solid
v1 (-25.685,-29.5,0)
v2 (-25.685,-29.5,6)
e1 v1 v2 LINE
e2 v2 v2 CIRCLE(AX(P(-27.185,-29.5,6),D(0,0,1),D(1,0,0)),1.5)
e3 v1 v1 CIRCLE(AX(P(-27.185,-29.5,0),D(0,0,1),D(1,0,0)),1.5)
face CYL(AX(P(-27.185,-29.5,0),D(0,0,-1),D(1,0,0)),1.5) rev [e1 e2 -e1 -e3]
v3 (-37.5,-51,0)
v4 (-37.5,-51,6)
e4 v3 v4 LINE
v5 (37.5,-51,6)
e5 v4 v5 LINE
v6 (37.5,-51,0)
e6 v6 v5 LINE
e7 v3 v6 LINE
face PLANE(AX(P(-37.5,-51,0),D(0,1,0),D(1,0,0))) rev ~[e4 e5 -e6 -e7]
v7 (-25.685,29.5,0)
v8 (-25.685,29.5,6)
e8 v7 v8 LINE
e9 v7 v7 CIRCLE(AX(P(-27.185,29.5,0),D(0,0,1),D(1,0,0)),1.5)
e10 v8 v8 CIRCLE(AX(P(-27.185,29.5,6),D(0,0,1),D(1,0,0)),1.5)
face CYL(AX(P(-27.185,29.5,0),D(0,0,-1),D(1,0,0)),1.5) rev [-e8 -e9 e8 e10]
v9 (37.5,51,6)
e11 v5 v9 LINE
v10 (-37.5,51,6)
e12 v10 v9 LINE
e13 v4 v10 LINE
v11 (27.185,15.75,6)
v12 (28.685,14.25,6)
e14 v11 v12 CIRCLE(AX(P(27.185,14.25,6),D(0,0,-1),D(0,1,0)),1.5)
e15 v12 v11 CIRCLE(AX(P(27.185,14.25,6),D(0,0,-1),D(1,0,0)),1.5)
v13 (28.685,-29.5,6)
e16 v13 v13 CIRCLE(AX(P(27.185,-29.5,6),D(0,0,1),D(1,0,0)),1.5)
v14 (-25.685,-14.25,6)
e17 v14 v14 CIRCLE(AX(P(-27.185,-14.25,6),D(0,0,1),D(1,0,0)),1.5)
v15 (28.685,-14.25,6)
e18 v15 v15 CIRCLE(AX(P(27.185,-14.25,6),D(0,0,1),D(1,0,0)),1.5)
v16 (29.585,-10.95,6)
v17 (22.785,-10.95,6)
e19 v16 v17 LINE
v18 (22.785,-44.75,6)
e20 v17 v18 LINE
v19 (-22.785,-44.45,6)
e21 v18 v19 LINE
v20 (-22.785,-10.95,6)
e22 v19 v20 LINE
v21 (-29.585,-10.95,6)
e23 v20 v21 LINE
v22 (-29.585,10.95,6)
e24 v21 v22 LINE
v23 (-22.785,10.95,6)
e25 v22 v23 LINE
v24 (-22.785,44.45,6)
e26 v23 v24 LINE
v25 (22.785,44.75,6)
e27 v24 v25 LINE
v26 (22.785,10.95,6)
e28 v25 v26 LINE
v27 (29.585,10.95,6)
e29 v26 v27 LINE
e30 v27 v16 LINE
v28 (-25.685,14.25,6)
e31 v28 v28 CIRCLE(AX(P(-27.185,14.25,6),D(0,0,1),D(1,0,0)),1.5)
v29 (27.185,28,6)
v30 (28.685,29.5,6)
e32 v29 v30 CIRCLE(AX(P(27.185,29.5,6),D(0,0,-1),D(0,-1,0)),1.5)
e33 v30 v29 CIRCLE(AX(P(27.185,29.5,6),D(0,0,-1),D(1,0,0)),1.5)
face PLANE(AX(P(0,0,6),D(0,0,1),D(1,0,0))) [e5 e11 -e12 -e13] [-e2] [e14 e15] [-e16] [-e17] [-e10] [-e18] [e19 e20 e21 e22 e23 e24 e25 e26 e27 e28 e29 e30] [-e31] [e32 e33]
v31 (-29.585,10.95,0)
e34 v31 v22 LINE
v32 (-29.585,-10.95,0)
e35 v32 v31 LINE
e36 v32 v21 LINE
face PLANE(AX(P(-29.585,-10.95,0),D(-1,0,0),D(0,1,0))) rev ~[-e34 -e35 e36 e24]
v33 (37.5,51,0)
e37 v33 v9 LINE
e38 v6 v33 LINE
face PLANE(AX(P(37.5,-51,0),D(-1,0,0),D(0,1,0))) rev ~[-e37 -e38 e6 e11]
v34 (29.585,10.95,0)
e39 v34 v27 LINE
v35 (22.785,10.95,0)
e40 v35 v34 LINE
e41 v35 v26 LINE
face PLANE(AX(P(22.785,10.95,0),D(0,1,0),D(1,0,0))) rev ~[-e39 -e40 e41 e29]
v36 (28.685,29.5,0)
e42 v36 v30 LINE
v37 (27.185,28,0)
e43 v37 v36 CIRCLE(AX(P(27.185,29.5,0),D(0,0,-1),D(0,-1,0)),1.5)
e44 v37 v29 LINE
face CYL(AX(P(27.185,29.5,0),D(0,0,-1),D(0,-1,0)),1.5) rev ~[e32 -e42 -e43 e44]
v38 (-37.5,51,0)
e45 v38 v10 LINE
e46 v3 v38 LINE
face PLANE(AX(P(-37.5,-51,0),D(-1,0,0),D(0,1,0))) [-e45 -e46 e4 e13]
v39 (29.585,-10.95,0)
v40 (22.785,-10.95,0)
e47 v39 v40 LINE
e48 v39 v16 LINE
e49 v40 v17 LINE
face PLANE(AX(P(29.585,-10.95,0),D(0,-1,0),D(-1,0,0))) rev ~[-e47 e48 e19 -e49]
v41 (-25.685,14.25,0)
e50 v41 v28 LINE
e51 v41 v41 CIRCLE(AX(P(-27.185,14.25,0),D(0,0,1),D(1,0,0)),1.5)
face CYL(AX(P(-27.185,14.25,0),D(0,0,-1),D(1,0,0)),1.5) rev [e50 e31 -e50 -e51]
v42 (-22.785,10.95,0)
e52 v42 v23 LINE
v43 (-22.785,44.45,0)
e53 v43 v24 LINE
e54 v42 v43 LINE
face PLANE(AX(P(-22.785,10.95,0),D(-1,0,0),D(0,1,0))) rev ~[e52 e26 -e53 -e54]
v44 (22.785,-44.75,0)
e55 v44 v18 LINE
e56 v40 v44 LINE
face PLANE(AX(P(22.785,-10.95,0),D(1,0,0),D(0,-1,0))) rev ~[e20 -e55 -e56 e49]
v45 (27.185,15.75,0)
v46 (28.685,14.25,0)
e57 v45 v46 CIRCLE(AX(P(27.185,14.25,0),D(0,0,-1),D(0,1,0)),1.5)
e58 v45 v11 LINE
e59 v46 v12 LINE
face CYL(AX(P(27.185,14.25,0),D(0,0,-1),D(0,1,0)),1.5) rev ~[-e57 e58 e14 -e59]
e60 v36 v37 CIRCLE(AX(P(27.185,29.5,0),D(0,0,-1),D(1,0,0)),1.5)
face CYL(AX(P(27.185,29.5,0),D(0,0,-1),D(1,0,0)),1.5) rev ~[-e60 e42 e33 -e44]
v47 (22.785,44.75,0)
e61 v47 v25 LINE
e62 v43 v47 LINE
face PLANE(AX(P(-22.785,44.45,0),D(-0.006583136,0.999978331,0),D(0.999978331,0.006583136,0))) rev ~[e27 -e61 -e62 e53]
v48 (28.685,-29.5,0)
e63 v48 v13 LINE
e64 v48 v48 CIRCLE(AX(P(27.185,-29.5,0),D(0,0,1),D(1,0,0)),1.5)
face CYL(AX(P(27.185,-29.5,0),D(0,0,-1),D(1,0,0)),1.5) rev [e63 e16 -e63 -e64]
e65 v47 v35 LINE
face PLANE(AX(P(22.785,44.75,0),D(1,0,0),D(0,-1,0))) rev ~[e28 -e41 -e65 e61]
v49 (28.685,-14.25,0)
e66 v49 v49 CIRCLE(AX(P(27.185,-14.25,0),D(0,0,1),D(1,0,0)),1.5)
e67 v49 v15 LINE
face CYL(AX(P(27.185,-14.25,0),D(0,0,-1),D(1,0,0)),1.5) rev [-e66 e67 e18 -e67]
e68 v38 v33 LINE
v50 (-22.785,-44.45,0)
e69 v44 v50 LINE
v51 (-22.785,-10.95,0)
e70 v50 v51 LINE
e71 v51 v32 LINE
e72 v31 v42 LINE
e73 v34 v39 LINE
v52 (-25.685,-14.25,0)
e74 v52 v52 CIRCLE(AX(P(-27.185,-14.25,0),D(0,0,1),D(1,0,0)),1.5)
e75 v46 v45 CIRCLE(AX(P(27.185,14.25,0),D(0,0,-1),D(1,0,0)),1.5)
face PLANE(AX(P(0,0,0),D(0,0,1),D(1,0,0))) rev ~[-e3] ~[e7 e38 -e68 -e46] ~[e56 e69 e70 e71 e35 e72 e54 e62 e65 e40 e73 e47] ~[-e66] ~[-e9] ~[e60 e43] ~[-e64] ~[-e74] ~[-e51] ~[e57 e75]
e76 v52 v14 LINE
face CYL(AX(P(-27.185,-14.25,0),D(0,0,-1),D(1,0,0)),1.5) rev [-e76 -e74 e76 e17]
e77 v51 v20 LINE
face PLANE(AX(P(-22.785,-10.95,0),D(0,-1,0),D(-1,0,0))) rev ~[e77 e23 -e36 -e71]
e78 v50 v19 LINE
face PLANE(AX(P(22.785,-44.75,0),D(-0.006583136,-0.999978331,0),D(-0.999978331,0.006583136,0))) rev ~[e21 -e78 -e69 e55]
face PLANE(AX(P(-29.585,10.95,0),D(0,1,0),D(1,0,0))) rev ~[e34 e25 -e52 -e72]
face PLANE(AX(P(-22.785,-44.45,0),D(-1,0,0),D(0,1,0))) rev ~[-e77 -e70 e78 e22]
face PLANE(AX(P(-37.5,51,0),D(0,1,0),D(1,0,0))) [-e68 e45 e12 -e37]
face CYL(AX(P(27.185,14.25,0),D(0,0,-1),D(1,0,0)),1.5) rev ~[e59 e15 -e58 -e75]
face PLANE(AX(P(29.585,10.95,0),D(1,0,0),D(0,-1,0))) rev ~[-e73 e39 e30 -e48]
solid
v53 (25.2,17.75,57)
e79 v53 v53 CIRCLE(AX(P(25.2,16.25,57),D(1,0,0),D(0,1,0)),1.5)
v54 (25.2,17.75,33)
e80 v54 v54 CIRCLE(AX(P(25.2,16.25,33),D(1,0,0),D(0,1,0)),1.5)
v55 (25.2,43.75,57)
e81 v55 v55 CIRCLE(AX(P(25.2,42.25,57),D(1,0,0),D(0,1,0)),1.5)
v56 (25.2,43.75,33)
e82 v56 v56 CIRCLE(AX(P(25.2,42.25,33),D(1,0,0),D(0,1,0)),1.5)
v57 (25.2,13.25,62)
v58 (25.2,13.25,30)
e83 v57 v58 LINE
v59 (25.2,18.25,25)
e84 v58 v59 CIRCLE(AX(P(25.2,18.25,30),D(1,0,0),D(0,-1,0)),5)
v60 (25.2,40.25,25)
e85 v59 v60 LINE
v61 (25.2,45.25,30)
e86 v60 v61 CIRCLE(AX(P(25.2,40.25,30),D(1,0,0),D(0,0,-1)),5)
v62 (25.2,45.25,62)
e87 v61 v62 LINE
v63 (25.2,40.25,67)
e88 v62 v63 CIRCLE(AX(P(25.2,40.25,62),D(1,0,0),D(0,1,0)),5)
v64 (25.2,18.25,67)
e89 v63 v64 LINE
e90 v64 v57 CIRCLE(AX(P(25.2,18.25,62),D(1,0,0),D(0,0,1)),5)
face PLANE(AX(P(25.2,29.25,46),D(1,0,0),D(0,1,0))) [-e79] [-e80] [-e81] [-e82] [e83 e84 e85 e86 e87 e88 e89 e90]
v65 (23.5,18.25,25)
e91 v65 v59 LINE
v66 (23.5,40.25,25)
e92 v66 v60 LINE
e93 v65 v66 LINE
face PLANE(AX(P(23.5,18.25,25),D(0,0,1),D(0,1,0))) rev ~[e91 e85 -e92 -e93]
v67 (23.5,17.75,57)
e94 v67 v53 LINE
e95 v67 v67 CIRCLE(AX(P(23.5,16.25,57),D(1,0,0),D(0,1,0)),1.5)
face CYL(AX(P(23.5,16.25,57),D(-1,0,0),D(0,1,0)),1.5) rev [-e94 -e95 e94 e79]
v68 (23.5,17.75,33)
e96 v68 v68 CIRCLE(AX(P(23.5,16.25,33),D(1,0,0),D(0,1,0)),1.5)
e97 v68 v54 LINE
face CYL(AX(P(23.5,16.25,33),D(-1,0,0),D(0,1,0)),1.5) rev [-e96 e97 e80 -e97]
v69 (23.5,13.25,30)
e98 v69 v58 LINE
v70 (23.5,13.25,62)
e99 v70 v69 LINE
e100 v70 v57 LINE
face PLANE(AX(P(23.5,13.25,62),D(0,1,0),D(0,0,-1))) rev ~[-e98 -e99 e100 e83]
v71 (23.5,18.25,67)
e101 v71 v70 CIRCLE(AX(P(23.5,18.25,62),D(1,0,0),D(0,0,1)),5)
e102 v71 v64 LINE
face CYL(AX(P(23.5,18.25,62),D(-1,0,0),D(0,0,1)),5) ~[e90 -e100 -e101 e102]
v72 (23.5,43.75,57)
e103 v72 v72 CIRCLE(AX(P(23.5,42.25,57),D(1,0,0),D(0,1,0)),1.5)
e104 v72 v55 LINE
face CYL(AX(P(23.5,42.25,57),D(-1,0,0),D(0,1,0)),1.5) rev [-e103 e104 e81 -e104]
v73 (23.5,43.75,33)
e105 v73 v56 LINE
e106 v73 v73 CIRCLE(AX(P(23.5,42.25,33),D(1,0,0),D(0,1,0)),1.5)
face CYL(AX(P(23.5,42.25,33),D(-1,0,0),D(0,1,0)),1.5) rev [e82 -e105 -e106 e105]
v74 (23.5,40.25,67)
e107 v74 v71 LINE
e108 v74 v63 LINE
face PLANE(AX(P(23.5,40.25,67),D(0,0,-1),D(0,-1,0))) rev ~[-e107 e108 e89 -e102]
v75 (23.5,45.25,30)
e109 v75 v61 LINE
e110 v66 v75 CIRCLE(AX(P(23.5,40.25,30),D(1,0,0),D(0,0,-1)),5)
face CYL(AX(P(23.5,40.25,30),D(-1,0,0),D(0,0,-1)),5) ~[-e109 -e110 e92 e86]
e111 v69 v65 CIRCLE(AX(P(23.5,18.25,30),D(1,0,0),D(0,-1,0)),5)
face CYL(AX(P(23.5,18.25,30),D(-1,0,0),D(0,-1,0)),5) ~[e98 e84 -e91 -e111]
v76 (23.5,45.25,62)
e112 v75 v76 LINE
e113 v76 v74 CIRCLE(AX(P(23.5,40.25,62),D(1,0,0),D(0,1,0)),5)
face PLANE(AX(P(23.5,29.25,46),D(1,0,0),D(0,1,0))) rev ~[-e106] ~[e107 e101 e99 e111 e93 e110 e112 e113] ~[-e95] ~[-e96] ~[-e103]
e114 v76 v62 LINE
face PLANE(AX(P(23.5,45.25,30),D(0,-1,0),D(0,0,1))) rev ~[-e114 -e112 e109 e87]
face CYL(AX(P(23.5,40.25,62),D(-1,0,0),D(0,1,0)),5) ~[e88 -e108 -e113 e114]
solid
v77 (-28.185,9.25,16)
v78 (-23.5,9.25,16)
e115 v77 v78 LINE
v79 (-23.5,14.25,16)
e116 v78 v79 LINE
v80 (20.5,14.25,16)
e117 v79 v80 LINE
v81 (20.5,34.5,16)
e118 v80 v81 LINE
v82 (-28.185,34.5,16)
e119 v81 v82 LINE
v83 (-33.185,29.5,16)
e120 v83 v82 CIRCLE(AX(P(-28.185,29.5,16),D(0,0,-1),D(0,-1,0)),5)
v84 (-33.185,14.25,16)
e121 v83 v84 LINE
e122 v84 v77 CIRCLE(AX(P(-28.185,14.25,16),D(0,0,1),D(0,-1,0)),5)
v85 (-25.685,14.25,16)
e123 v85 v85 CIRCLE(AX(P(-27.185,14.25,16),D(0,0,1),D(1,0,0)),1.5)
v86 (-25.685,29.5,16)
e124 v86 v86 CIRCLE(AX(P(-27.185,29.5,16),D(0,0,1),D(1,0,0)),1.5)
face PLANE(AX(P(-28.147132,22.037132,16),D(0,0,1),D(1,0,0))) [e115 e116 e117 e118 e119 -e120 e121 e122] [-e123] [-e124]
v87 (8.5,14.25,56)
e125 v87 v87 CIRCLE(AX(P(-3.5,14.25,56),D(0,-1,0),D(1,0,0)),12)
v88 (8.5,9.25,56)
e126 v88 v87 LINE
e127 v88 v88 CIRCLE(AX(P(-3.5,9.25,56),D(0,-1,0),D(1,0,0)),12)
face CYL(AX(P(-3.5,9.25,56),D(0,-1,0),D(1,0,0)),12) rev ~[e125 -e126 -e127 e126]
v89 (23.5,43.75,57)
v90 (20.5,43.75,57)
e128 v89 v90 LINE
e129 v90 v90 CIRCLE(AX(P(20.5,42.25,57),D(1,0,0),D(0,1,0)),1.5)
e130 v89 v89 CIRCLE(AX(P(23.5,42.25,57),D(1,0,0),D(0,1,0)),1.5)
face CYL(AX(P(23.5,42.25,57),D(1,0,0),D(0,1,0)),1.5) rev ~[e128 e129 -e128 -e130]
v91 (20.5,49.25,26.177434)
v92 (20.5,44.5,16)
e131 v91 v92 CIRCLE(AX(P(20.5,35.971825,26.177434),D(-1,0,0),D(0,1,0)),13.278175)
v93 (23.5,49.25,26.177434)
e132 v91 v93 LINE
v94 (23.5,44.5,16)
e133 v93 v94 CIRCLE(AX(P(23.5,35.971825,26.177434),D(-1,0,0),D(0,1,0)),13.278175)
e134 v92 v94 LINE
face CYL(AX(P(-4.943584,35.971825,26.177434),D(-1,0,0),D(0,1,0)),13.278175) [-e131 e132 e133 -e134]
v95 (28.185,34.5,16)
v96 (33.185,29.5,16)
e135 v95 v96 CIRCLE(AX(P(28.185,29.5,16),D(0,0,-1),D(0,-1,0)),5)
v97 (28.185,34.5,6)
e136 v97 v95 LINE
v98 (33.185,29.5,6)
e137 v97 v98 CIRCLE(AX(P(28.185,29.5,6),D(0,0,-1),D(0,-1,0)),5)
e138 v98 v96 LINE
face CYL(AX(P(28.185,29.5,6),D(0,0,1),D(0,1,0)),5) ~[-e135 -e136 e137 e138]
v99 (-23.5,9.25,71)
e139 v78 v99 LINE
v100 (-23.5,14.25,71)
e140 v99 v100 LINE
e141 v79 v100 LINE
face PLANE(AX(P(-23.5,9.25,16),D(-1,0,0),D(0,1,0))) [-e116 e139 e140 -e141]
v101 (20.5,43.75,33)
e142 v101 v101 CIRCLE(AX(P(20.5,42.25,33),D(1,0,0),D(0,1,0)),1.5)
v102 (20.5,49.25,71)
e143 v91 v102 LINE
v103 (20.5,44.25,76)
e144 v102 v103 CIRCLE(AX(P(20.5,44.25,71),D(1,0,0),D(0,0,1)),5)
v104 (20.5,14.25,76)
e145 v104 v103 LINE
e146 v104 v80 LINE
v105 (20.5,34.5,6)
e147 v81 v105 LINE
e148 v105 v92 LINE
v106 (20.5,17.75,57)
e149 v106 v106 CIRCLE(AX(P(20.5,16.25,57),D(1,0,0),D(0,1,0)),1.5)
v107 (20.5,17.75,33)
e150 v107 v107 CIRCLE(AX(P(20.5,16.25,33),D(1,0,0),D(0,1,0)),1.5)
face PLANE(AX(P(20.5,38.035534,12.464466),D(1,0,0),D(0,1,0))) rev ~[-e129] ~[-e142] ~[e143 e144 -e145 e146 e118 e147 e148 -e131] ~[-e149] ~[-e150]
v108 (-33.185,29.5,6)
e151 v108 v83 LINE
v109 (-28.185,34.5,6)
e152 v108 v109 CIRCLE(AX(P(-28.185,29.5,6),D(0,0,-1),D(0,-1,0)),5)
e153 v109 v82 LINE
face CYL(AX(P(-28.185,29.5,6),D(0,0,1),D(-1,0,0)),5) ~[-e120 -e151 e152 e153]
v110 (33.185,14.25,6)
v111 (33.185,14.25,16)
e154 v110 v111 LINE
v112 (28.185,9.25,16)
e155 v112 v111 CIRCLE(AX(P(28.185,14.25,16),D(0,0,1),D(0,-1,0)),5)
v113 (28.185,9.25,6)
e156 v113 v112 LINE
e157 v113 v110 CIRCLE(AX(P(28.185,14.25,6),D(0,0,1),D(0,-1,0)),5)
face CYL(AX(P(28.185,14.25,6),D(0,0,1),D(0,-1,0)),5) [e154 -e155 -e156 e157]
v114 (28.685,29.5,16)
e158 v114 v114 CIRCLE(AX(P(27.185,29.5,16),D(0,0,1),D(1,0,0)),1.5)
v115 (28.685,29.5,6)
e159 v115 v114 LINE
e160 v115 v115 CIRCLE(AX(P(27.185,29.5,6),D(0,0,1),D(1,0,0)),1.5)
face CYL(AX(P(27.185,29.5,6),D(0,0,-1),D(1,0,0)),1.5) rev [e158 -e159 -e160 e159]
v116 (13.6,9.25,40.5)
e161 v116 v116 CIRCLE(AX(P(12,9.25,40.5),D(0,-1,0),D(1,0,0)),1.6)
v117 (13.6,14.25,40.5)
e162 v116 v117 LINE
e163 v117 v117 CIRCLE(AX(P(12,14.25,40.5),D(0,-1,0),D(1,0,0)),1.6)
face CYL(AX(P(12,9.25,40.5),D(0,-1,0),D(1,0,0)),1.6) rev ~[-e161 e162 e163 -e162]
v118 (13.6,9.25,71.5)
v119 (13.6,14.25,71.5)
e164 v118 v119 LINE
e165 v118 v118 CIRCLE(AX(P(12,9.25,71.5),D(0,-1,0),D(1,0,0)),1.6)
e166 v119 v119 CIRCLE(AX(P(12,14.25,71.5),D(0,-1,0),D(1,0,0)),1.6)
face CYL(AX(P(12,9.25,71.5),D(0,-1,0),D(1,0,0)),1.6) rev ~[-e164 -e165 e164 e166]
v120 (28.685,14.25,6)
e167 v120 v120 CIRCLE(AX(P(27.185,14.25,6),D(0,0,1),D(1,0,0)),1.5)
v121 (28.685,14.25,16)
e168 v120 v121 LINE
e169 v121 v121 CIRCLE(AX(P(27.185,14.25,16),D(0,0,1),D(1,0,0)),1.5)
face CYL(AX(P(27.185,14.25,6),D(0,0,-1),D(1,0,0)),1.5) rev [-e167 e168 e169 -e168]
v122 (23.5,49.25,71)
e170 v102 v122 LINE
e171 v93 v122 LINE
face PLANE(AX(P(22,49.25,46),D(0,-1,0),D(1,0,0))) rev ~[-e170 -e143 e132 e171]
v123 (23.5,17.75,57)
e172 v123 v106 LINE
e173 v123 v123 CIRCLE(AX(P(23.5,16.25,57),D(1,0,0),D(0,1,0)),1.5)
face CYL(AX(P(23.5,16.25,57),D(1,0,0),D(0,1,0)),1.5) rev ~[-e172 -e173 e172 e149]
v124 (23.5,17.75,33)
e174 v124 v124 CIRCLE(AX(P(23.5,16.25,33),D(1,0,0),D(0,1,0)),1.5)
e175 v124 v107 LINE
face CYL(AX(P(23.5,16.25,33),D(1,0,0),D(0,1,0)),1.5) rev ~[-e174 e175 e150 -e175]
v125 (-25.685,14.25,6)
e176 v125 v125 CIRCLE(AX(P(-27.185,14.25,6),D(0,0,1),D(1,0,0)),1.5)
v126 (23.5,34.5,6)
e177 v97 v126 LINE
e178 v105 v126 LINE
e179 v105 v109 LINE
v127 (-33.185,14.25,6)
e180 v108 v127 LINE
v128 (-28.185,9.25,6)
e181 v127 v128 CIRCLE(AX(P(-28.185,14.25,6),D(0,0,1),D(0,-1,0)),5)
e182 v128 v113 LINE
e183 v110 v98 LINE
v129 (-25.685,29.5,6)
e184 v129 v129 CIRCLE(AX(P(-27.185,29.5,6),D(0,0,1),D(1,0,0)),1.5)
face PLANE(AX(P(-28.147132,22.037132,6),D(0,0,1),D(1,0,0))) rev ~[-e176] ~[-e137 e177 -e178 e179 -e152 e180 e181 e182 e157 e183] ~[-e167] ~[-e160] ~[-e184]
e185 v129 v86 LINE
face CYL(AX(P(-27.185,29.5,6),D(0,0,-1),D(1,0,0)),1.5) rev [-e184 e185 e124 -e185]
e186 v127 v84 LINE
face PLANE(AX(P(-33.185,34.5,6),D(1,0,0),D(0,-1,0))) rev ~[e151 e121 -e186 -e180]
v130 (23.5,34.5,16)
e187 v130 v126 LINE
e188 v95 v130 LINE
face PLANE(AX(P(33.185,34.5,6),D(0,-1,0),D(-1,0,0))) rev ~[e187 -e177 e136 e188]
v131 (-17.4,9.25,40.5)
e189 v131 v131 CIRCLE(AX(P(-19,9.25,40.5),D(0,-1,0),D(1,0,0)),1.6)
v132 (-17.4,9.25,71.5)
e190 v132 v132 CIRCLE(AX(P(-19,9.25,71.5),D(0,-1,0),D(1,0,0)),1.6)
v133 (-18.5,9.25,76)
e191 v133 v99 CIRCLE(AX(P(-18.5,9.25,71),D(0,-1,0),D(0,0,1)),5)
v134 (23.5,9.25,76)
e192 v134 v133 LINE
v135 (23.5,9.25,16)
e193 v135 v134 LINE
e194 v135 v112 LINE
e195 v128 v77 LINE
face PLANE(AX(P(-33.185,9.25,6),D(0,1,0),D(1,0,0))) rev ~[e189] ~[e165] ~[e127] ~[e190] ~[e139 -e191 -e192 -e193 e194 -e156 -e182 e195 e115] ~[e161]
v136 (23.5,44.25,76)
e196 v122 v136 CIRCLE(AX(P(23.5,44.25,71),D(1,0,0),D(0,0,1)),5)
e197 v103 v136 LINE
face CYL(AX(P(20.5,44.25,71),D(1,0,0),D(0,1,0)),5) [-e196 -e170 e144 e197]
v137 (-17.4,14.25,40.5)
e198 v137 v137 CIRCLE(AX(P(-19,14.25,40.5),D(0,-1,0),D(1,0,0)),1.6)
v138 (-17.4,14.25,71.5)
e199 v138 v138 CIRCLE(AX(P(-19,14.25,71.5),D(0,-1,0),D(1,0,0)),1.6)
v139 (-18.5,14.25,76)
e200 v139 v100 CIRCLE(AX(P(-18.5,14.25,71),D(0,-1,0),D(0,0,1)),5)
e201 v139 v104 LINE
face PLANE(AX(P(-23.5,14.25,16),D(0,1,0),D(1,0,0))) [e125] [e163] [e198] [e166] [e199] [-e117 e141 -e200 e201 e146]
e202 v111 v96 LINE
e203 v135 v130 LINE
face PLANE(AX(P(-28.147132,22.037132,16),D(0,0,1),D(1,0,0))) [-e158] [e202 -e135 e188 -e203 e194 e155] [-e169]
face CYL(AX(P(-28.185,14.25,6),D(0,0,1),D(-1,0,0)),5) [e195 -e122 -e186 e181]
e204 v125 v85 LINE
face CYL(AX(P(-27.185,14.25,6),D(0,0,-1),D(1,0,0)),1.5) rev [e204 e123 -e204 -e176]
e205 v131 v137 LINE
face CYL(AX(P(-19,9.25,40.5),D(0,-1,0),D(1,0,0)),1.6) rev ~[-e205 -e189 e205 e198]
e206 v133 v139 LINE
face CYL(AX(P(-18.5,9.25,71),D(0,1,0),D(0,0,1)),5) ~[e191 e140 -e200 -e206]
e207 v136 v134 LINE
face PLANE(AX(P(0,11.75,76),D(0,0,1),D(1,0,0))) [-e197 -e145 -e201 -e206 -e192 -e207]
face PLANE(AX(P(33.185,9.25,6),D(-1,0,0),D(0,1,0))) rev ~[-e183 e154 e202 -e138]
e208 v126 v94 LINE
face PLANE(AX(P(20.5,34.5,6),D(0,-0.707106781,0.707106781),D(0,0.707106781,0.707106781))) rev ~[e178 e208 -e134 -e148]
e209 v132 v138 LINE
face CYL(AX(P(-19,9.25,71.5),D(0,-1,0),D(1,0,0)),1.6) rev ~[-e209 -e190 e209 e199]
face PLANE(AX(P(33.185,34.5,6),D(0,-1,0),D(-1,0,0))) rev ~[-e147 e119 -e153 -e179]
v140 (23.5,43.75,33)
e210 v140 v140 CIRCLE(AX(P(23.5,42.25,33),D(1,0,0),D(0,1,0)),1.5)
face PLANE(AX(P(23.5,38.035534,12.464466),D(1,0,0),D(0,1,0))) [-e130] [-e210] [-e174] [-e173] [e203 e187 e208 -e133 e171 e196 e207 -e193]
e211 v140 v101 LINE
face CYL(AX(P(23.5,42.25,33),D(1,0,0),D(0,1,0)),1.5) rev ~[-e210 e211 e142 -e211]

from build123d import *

# Parameters (mm, degrees)
F0_W         = 75
F0_H         = 102
F0_R         = 1.5
F1_DEPTH     = 6
F2_R         = 1.5
F3_DEPTH     = 10
F4_W         = 47
F4_H         = 5
F5_DEPTH     = 60
F6_R         = 12
F6_R_2       = 1.6
F7_DEPTH     = 25
F6_W         = 3
F6_H         = 60
F8_DEPTH     = 40
F9_R         = 1.5
F10_DEPTH    = 25
F11_T1_DEPTH = 3
F12_T1_DEPTH = 53.8871689707
F13_DEPTH    = 1.7
F14_R        = 5


# Not quite as in the source:
# - a fillet or chamfer that OpenCascade refuses, or shapes differently, is made with other operations: its cross-section is extruded or revolved along the edge and cut away or added


with BuildPart() as f1:
    # F0 (on Top) → F1 (new body)
    with BuildSketch(Plane.XY):
        Rectangle(F0_W, F0_H)
        with Locations((-27.185, -29.5)):
            Circle(F0_R, mode=Mode.SUBTRACT)
        with Locations((-27.185, -14.25)):
            Circle(F0_R, mode=Mode.SUBTRACT)
        with Locations((27.185, -29.5)):
            Circle(F0_R, mode=Mode.SUBTRACT)
        with Locations((27.185, -14.25)):
            Circle(F0_R, mode=Mode.SUBTRACT)
        with Locations((-27.185, 14.25)):
            Circle(F0_R, mode=Mode.SUBTRACT)
        with Locations((-27.185, 29.5)):
            Circle(F0_R, mode=Mode.SUBTRACT)
        Polygon((-22.785, 10.95), (-22.785, 44.45), (22.785, 44.75), (22.785, 10.95), (29.585, 10.95), (29.585, 0), (29.585, -10.95), (22.785, -10.95), (22.785, -44.75), (-22.785, -44.45), (-22.785, -10.95), (-29.585, -10.95), (-29.585, 0), (-29.585, 10.95), align=None, mode=Mode.SUBTRACT)
        with BuildLine():
            ThreePointArc((28.685, 14.25), (26.1243398282, 13.1893398282), (27.185, 15.75))
            ThreePointArc((27.185, 15.75), (28.2456601718, 15.3106601718), (28.685, 14.25))
        make_face(mode=Mode.SUBTRACT)
        with BuildLine():
            ThreePointArc((27.185, 28), (26.1243398282, 30.5606601718), (28.685, 29.5))
            ThreePointArc((28.685, 29.5), (28.2456601718, 28.4393398282), (27.185, 28))
        make_face(mode=Mode.SUBTRACT)
    extrude(amount=F1_DEPTH)


with BuildPart() as f3:
    # F2 (on face) → F3 (new body)
    with BuildSketch(Plane.XY.offset(6)):
        Polygon((-22.785, 34.5), (-33.185, 34.5), (-33.185, 9.25), (-29.585, 9.25), (-29.585, 10.95), (-22.785, 10.95), align=None)
        with Locations((-27.185, 14.25)):
            Circle(F2_R, mode=Mode.SUBTRACT)
        with Locations((-27.185, 29.5)):
            Circle(F2_R, mode=Mode.SUBTRACT)
        Polygon((22.785, 34.5), (-22.785, 34.5), (-22.785, 10.95), (-29.585, 10.95), (-29.585, 9.25), (29.585, 9.25), (29.585, 10.95), (22.785, 10.95), align=None)
        Polygon((33.185, 34.5), (22.785, 34.5), (22.785, 10.95), (29.585, 10.95), (29.585, 9.25), (33.185, 9.25), align=None)
        with Locations((27.185, 14.25)):
            Circle(F2_R, mode=Mode.SUBTRACT)
        with Locations((27.185, 29.5)):
            Circle(F2_R, mode=Mode.SUBTRACT)
    extrude(amount=F3_DEPTH)

    # F4 (on face) → F5 (join)
    with BuildSketch(Plane.XY.offset(16)):
        with Locations((0, 11.75)):
            Rectangle(F4_W, F4_H)
    extrude(amount=F5_DEPTH)

    # F6 (on face) → F7 (cut)
    with BuildSketch(Plane.XZ.offset(-9.25)):
        with Locations((-3.5, 56)):
            Circle(F6_R)
        with Locations((-19, 71.5)):
            Circle(F6_R_2)
        with Locations((12, 71.5)):
            Circle(F6_R_2)
        with Locations((12, 40.5)):
            Circle(F6_R_2)
        with Locations((-19, 40.5)):
            Circle(F6_R_2)
    extrude(amount=-F7_DEPTH, mode=Mode.SUBTRACT)

    # F6 (on face) → F8 (join)
    with BuildSketch(Plane.XZ.offset(-9.25)):
        with Locations((22, 46)):
            Rectangle(F6_W, F6_H)
    extrude(amount=-F8_DEPTH)

    # F9 (on face) → F10 (cut)
    with BuildSketch(Plane.YZ.offset(23.5)):
        with Locations((16.25, 57)):
            Circle(F9_R)
        with Locations((42.25, 57)):
            Circle(F9_R)
        with Locations((16.25, 33)):
            Circle(F9_R)
        with Locations((42.25, 33)):
            Circle(F9_R)
    extrude(amount=-F10_DEPTH, mode=Mode.SUBTRACT)

    # F11: chamfer of 10 on 2 edges, made by hand

    # F11_s2 → F11_t1 (join)
    with BuildSketch(Plane.YZ.offset(20.5)):
        Polygon((34.5, 6), (44.5, 16), (34.5, 16), align=None)
    extrude(amount=F11_T1_DEPTH)

    # F12: fillet of radius 13.2781745931 on 1 edges, made by hand

    # F12_s2 → F12_t1 (cut)
    with BuildSketch(Plane.YZ.offset(-4.9435844853)):
        with BuildLine():
            ThreePointArc((49.25, 26.1774337941), (48.0040428196, 20.5617713525), (44.5, 16))
            Line((44.5, 16), (49.25, 16))
            Line((49.25, 16), (49.25, 26.1774337941))
        make_face()
    extrude(amount=F12_T1_DEPTH, mode=Mode.SUBTRACT)

    # F14
    f14_edges = [f3.edges().sort_by_distance(p)[0] for p in [
        (22, 49.25, 76),
        (-23.5, 11.75, 76),
        (-33.185, 34.5, 11),
        (-33.185, 9.25, 11),
        (33.185, 9.25, 11),
        (33.185, 34.5, 11),
    ]]
    fillet(f14_edges, radius=F14_R)


with BuildPart() as f13:
    # F9 (on face) → F13 (new body)
    with BuildSketch(Plane.YZ.offset(23.5)):
        with BuildLine():
            Line((40.25, 67), (18.25, 67))
            ThreePointArc((18.25, 67), (14.7144660941, 65.5355339059), (13.25, 62))
            Line((13.25, 62), (13.25, 30))
            ThreePointArc((13.25, 30), (14.7144660941, 26.4644660941), (18.25, 25))
            Line((18.25, 25), (40.25, 25))
            ThreePointArc((40.25, 25), (43.7855339059, 26.4644660941), (45.25, 30))
            Line((45.25, 30), (45.25, 62))
            ThreePointArc((45.25, 62), (43.7855339059, 65.5355339059), (40.25, 67))
        make_face()
        with Locations((16.25, 33)):
            Circle(F9_R, mode=Mode.SUBTRACT)
        with Locations((42.25, 33)):
            Circle(F9_R, mode=Mode.SUBTRACT)
        with Locations((16.25, 57)):
            Circle(F9_R, mode=Mode.SUBTRACT)
        with Locations((42.25, 57)):
            Circle(F9_R, mode=Mode.SUBTRACT)
    extrude(amount=F13_DEPTH)


solid = Compound([f1.part, f3.part, f13.part])
